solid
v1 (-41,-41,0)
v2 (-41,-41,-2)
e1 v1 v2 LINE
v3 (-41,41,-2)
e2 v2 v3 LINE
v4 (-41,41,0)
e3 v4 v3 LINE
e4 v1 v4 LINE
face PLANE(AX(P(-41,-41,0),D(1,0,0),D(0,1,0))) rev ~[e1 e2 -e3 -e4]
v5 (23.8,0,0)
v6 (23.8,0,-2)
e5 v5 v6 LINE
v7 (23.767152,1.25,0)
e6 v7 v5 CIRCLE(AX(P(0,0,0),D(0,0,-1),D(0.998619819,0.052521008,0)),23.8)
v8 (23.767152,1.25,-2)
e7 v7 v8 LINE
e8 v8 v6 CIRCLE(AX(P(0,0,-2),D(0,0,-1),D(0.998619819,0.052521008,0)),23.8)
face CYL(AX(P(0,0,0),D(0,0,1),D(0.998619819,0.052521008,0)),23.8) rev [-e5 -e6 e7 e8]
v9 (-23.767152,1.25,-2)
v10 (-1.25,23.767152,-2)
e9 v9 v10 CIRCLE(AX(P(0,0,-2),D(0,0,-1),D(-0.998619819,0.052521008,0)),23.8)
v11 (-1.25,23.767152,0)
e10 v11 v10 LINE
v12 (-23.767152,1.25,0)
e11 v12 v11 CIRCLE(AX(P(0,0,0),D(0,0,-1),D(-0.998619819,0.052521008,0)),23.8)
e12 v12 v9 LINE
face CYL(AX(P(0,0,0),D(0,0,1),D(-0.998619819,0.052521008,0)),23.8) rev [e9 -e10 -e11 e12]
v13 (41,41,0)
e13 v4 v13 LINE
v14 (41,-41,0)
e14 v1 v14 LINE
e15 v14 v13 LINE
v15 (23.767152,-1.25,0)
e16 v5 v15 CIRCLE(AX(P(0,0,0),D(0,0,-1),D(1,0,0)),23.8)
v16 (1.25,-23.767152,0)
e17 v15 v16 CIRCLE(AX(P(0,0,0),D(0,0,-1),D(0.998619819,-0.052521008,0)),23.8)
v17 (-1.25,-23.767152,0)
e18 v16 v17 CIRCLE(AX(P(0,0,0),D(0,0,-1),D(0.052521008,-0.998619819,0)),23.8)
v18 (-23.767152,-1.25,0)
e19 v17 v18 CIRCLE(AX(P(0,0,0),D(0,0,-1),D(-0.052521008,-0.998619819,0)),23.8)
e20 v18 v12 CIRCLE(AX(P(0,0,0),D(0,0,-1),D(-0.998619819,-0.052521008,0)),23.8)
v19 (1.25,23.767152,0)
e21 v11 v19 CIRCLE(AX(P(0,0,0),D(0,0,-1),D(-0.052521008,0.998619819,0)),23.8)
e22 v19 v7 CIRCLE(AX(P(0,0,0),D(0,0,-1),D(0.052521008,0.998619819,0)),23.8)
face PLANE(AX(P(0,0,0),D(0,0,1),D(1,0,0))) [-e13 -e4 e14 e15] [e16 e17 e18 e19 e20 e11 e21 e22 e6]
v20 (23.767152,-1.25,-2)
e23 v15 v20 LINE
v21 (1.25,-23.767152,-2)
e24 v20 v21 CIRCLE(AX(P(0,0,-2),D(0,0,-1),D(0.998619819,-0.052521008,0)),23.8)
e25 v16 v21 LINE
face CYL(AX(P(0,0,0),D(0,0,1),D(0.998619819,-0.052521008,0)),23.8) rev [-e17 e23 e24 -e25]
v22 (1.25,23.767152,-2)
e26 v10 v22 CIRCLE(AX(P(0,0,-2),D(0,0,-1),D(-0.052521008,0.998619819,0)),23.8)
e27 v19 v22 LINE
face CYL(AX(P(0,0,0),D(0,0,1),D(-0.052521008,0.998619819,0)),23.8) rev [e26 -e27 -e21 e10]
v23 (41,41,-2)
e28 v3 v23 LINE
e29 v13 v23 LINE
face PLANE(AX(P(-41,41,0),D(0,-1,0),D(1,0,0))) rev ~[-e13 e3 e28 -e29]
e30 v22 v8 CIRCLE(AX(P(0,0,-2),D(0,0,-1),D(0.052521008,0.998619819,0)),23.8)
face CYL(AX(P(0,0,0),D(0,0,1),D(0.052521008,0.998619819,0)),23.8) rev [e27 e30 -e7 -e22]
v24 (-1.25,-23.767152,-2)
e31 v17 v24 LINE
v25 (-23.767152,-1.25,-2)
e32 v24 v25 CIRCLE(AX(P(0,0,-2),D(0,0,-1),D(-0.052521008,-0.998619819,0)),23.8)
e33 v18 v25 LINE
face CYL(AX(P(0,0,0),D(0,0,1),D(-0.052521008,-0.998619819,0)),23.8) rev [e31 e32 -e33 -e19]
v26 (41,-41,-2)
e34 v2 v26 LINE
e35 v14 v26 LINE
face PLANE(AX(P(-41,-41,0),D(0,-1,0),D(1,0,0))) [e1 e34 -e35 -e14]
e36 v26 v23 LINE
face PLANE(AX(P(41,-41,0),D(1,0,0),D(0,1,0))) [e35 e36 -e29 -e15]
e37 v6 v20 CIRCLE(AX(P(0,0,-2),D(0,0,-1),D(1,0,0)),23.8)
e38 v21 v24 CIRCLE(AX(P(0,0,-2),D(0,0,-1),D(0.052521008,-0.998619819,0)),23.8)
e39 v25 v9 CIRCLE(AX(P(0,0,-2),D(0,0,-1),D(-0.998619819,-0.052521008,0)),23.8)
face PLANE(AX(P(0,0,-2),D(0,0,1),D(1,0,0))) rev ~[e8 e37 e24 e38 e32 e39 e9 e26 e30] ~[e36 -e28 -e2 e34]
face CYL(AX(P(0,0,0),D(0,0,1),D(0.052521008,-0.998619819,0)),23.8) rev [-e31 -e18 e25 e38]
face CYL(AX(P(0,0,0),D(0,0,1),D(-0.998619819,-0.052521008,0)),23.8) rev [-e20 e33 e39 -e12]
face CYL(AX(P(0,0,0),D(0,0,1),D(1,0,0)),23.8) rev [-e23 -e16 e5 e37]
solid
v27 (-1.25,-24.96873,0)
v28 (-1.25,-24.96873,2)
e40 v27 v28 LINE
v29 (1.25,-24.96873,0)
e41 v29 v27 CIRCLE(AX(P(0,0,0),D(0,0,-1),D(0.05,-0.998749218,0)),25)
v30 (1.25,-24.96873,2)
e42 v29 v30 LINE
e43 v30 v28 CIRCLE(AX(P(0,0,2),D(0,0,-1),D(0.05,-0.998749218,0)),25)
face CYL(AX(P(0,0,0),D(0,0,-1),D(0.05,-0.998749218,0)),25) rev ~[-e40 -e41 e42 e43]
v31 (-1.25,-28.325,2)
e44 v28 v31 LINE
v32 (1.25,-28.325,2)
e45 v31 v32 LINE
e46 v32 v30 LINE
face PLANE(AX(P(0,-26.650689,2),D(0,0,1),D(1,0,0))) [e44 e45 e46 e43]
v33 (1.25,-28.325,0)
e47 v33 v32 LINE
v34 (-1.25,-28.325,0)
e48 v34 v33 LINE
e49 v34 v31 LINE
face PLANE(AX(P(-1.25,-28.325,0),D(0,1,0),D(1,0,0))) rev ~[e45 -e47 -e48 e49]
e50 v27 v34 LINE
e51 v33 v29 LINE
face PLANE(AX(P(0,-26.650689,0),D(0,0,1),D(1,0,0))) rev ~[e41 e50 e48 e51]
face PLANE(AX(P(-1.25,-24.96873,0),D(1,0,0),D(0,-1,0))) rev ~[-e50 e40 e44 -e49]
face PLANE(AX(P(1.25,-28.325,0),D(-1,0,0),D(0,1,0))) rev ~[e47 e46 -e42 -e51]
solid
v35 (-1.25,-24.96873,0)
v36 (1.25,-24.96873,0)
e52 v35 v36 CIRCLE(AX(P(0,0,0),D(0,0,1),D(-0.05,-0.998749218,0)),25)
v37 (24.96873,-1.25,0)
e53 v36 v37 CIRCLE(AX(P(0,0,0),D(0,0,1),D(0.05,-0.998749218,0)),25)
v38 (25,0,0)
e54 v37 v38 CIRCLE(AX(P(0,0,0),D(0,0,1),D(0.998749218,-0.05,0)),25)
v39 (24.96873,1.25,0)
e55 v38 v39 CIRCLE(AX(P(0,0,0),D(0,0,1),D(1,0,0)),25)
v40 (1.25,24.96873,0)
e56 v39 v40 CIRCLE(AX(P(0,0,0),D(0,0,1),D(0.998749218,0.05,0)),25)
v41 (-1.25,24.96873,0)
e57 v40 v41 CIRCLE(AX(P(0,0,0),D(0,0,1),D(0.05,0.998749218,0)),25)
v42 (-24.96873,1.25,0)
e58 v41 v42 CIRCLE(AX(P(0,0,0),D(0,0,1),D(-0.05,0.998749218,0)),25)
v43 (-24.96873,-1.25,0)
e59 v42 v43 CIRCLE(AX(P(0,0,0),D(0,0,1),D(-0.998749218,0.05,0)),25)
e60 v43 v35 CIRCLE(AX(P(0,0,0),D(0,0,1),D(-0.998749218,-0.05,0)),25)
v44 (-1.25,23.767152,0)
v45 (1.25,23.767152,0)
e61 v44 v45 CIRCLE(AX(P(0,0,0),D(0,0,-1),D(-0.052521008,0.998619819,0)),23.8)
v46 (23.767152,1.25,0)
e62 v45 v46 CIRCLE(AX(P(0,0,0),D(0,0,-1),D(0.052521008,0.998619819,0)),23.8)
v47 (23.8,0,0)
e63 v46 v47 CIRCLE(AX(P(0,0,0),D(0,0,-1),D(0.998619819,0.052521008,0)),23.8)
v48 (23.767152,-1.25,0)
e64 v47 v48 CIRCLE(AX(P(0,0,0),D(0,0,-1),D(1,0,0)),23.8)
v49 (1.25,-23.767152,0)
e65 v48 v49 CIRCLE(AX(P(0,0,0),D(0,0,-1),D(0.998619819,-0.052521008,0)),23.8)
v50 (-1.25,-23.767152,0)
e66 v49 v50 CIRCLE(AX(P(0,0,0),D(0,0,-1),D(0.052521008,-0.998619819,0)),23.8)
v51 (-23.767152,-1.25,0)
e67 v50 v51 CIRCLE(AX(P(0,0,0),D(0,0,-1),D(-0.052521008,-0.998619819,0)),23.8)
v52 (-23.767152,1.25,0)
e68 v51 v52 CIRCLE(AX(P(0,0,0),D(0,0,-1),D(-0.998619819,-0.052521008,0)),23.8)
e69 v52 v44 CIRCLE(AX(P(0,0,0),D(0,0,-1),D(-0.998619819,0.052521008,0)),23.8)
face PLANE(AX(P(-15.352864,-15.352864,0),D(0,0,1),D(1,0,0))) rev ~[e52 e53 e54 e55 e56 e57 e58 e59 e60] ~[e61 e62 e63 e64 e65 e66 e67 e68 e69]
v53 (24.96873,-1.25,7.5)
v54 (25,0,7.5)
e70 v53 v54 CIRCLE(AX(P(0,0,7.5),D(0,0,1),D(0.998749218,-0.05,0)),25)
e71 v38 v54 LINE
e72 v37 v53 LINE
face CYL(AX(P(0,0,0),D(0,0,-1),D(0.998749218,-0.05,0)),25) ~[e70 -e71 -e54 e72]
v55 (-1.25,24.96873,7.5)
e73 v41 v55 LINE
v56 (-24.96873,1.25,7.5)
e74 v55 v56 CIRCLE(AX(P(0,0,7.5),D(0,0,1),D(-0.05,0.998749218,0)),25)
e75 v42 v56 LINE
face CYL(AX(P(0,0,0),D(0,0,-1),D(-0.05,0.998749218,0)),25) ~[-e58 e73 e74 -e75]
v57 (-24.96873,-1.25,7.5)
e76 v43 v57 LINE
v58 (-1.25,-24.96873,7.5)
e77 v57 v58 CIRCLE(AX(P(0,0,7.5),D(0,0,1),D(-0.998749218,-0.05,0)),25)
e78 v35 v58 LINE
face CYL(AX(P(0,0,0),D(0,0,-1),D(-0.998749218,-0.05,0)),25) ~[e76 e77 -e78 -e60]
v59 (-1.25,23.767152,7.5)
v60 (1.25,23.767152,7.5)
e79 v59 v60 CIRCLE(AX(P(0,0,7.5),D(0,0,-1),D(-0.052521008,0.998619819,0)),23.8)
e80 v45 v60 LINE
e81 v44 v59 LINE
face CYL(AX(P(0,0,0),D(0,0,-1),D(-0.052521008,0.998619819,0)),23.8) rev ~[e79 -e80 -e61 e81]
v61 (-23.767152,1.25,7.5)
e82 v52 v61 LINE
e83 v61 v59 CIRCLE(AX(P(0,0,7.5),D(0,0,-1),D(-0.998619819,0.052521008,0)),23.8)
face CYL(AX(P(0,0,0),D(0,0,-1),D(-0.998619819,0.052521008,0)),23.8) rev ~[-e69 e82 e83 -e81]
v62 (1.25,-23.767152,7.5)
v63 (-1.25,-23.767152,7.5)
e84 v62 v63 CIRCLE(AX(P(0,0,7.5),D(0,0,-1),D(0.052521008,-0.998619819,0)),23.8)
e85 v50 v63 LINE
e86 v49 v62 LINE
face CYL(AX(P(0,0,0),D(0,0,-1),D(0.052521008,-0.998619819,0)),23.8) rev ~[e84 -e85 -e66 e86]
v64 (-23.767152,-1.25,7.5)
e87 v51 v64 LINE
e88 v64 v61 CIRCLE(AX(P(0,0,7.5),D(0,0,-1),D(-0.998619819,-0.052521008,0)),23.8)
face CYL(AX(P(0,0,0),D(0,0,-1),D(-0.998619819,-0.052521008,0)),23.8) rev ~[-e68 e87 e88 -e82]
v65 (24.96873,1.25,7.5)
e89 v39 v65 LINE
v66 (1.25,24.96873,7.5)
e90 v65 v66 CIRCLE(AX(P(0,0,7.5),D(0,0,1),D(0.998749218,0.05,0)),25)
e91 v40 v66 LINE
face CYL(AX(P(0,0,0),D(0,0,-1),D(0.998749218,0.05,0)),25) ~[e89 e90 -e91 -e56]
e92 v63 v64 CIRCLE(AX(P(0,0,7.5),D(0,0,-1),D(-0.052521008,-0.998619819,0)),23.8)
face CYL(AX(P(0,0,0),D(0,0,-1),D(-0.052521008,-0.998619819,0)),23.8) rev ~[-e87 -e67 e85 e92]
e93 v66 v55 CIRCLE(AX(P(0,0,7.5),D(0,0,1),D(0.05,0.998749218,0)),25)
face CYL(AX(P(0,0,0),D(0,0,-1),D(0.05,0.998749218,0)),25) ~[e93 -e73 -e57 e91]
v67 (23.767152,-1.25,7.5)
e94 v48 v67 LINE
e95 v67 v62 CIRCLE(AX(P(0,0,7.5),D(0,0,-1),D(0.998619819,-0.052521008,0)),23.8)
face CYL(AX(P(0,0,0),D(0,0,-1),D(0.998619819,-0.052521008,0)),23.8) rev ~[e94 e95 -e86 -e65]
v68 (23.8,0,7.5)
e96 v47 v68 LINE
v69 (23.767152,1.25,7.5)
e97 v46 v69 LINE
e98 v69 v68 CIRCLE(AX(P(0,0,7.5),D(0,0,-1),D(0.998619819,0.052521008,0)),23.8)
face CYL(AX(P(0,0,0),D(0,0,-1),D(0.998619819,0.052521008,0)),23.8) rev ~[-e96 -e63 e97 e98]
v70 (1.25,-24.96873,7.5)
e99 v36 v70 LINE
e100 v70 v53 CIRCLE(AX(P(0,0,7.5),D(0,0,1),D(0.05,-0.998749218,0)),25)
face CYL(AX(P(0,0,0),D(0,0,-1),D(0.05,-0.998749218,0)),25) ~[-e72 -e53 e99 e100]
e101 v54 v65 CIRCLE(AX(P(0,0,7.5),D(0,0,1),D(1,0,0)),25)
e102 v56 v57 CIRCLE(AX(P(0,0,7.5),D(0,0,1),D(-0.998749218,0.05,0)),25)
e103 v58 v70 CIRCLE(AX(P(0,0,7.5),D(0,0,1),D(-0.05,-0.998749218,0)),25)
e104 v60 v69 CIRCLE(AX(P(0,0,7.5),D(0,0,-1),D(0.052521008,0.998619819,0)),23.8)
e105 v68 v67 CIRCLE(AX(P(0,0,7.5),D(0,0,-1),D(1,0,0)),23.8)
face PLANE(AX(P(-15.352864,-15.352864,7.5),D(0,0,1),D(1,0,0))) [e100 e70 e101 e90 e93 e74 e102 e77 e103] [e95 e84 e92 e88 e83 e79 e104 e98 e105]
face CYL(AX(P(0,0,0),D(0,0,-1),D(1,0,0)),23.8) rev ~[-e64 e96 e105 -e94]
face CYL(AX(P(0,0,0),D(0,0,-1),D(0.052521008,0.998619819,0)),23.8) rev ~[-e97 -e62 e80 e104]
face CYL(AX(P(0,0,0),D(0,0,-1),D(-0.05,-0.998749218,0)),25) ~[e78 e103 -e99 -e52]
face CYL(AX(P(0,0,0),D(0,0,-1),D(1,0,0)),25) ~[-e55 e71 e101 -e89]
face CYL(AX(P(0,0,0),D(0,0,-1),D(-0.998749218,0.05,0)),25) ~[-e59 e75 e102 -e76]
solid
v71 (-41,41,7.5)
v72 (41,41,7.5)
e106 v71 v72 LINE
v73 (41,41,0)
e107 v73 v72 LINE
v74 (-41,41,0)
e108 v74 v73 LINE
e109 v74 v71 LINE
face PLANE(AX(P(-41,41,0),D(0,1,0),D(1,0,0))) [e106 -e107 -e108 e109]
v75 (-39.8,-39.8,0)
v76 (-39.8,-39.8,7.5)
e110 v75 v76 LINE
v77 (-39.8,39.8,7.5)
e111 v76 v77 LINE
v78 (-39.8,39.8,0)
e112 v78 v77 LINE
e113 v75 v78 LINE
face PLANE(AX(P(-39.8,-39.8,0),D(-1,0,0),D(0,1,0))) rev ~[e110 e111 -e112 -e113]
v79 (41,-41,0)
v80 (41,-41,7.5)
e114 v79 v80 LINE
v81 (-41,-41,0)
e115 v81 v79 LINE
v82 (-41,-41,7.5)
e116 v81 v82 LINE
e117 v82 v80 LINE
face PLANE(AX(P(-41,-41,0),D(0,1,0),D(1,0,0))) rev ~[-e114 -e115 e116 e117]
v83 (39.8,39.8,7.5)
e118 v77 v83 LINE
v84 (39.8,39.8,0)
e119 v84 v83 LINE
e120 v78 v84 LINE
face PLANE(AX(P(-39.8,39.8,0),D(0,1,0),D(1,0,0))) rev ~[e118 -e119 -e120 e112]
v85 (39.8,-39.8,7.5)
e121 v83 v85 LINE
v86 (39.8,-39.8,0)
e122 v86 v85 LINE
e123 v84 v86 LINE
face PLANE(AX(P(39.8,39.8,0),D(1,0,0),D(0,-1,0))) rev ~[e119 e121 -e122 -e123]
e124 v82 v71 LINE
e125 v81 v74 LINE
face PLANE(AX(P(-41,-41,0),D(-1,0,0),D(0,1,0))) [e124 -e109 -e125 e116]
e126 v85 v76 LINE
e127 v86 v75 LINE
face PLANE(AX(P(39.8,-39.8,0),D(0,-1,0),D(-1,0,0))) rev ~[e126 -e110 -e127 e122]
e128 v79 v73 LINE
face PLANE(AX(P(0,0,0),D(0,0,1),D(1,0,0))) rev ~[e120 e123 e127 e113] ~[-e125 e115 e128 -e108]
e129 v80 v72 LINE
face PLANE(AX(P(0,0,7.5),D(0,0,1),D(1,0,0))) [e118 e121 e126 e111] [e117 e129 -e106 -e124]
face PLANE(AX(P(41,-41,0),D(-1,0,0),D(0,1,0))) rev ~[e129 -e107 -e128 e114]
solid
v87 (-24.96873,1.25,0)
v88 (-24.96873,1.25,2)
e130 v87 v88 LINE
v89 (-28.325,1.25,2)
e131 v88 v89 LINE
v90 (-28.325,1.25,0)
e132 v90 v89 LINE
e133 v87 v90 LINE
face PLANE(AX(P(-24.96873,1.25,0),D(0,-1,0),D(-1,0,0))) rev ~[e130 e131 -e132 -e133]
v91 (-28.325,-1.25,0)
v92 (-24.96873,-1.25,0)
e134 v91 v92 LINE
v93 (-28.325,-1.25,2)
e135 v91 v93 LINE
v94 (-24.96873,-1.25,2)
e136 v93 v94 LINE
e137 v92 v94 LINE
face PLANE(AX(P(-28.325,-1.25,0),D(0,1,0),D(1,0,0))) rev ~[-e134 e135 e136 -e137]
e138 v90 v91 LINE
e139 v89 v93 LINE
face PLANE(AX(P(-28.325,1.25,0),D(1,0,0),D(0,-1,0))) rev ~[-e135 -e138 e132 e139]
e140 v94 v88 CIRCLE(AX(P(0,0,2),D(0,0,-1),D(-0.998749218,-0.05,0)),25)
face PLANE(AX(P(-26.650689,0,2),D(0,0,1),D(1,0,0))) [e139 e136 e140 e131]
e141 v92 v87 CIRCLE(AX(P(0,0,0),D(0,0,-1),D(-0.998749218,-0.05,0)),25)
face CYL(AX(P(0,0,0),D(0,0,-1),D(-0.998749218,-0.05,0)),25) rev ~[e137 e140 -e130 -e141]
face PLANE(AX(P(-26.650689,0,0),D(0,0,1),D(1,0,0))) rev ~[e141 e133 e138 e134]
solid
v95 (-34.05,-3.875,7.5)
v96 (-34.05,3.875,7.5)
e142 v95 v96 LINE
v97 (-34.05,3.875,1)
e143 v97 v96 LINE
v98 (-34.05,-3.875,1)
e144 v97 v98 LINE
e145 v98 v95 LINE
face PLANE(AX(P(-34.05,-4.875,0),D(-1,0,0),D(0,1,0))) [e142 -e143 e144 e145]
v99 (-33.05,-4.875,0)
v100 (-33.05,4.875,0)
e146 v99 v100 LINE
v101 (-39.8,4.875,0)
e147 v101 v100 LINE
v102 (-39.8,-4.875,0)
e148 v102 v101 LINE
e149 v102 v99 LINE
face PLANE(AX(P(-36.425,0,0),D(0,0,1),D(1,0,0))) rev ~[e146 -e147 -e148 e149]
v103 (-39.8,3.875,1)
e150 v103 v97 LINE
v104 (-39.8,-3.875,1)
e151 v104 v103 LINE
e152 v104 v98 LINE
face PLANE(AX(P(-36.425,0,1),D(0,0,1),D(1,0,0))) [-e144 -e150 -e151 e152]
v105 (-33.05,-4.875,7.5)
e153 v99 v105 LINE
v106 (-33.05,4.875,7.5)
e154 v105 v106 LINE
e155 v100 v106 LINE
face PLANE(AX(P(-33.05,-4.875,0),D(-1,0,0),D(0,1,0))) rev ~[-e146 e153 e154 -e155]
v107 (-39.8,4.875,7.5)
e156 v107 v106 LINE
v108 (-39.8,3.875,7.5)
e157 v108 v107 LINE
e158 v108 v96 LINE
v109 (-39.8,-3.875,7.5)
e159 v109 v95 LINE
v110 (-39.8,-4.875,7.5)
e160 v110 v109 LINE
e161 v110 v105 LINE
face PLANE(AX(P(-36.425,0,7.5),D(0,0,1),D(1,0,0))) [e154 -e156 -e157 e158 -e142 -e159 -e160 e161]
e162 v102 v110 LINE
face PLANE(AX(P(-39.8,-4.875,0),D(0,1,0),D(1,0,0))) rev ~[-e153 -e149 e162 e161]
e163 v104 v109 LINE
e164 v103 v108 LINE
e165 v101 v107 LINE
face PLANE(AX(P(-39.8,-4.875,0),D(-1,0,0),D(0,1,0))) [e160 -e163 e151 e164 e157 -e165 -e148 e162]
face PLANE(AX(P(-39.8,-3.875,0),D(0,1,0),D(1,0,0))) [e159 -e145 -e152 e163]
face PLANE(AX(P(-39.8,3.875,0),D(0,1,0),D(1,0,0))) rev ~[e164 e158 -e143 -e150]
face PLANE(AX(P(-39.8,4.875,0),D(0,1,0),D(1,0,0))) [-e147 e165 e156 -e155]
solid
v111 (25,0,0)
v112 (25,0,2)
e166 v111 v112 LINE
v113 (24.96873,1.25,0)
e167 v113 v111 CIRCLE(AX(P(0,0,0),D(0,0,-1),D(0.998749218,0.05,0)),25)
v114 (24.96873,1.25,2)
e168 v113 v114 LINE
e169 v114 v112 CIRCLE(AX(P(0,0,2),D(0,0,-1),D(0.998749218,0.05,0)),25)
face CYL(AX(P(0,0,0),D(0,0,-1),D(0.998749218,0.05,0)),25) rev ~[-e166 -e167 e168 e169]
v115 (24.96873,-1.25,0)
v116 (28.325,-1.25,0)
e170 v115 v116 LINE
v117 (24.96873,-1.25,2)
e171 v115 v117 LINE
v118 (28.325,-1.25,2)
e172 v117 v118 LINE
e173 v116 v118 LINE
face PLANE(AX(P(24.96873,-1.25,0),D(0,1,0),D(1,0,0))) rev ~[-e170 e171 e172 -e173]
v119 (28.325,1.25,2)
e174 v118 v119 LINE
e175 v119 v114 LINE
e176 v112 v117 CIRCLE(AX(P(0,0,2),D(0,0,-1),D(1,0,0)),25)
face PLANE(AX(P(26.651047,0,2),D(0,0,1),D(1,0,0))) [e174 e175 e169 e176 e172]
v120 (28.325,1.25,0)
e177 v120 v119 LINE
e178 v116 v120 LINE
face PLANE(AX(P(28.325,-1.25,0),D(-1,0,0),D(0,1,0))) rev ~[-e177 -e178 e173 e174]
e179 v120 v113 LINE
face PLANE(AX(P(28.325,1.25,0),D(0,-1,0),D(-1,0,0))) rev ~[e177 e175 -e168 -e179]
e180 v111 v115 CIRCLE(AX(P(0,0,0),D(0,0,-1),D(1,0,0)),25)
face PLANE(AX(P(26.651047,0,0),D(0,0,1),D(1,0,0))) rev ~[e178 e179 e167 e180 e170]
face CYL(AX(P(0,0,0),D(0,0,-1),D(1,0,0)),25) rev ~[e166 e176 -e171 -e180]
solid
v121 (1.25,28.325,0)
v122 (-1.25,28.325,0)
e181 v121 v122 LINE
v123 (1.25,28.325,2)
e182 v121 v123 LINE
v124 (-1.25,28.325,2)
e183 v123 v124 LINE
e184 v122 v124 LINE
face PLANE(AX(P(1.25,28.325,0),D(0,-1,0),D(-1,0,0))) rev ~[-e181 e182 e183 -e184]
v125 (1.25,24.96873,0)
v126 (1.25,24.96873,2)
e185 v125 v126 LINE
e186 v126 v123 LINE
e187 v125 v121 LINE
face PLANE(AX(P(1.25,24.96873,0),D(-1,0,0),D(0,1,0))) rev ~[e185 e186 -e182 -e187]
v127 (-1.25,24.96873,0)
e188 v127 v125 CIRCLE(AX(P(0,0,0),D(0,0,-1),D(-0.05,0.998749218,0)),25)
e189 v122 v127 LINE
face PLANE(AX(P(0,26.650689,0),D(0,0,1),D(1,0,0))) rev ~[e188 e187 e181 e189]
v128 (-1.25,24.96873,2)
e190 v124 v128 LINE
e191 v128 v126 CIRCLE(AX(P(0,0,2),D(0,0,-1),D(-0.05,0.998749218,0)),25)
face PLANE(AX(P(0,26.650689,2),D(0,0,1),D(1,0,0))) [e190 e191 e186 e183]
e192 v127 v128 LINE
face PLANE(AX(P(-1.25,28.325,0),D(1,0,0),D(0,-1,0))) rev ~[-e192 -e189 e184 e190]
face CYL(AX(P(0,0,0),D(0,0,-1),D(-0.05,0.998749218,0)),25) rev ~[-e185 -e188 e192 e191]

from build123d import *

# Parameters (mm, degrees)
F1_DEPTH = 7.5
F0_W     = 82
F0_H     = 82
F0_R     = 32.8
F0_W_2   = 6.75
F0_H_2   = 9.75
F2_DEPTH = 2
F3_DEPTH = 2
F4_DEPTH = 7.5
F5_T     = -1


# Not quite as in the source:
# - a feature names something its author has since deleted; it is built from what else it names


with BuildPart() as f1:
    # F0 (on Top) → F1 (new body)
    with BuildSketch(Plane.XY):
        with BuildLine():
            ThreePointArc((-24.9687304443, -1.25), (-17.6776695297, -17.6776695297), (-1.25, -24.9687304443))
            Line((-1.25, -24.9687304443), (-1.25, -23.7671517015))
            ThreePointArc((-1.25, -23.7671517015), (-16.8291413922, -16.8291413922), (-23.7671517015, -1.25))
            Line((-23.7671517015, -1.25), (-24.9687304443, -1.25))
        make_face()
        with BuildLine():
            Line((-1.25, 23.7671517015), (-1.25, 24.9687304443))
            ThreePointArc((-1.25, 24.9687304443), (-17.6776695297, 17.6776695297), (-24.9687304443, 1.25))
            Line((-24.9687304443, 1.25), (-23.7671517015, 1.25))
            ThreePointArc((-23.7671517015, 1.25), (-16.8291413922, 16.8291413922), (-1.25, 23.7671517015))
        make_face()
        with BuildLine():
            Line((23.7671517015, 1.25), (24.9687304443, 1.25))
            ThreePointArc((24.9687304443, 1.25), (17.6776695297, 17.6776695297), (1.25, 24.9687304443))
            Line((1.25, 24.9687304443), (1.25, 23.7671517015))
            ThreePointArc((1.25, 23.7671517015), (16.8291413922, 16.8291413922), (23.7671517015, 1.25))
        make_face()
        with BuildLine():
            ThreePointArc((1.25, -24.9687304443), (17.6776695297, -17.6776695297), (24.9687304443, -1.25))
            Line((24.9687304443, -1.25), (23.7671517015, -1.25))
            ThreePointArc((23.7671517015, -1.25), (16.8291413922, -16.8291413922), (1.25, -23.7671517015))
            Line((1.25, -23.7671517015), (1.25, -24.9687304443))
        make_face()
        with BuildLine():
            Line((1.25, 23.7671517015), (1.25, 24.9687304443))
            ThreePointArc((1.25, 24.9687304443), (0, 25), (-1.25, 24.9687304443))
            Line((-1.25, 24.9687304443), (-1.25, 23.7671517015))
            ThreePointArc((-1.25, 23.7671517015), (0, 23.8), (1.25, 23.7671517015))
        make_face()
        with BuildLine():
            ThreePointArc((-1.25, -24.9687304443), (0, -25), (1.25, -24.9687304443))
            Line((1.25, -24.9687304443), (1.25, -23.7671517015))
            ThreePointArc((1.25, -23.7671517015), (0, -23.8), (-1.25, -23.7671517015))
            Line((-1.25, -23.7671517015), (-1.25, -24.9687304443))
        make_face()
        with BuildLine():
            ThreePointArc((24.9687304443, -1.25), (24.9921813885, -0.6251955264), (25, 0))
            ThreePointArc((25, 0), (24.9921813885, 0.6251955264), (24.9687304443, 1.25))
            Line((24.9687304443, 1.25), (23.7671517015, 1.25))
            ThreePointArc((23.7671517015, 1.25), (23.7917865081, 0.6252157649), (23.8, 0))
            ThreePointArc((23.8, 0), (23.7917865081, -0.6252157649), (23.7671517015, -1.25))
            Line((23.7671517015, -1.25), (24.9687304443, -1.25))
        make_face()
        with BuildLine():
            Line((-23.7671517015, 1.25), (-24.9687304443, 1.25))
            ThreePointArc((-24.9687304443, 1.25), (-25, 0), (-24.9687304443, -1.25))
            Line((-24.9687304443, -1.25), (-23.7671517015, -1.25))
            ThreePointArc((-23.7671517015, -1.25), (-23.8, 0), (-23.7671517015, 1.25))
        make_face()
    extrude(amount=F1_DEPTH)


with BuildPart() as f1b:
    # F0 (on Top) → F1, piece 2 (new body)
    with BuildSketch(Plane.XY):
        Rectangle(F0_W, F0_H)
        Polygon((-39.8, 4.875), (-39.8, 39.8), (39.8, 39.8), (39.8, -39.8), (-39.8, -39.8), (-39.8, -4.875), align=None, mode=Mode.SUBTRACT)
    extrude(amount=F1_DEPTH)


with BuildPart() as f2:
    # F0 (on Top) → F2 (new body)
    with BuildSketch(Plane.XY):
        Rectangle(F0_W, F0_H)
        Polygon((-39.8, 4.875), (-39.8, 39.8), (39.8, 39.8), (39.8, -39.8), (-39.8, -39.8), (-39.8, -4.875), align=None, mode=Mode.SUBTRACT)
        Polygon((39.8, 39.8), (-39.8, 39.8), (-39.8, 4.875), (-33.05, 4.875), (-33.05, -4.875), (-39.8, -4.875), (-39.8, -39.8), (39.8, -39.8), align=None)
        Circle(F0_R, mode=Mode.SUBTRACT)
        Circle(F0_R)
        with BuildLine():
            ThreePointArc((1.25, 24.9687304443), (17.6776695297, 17.6776695297), (24.9687304443, 1.25))
            Line((24.9687304443, 1.25), (28.325, 1.25))
            Line((28.325, 1.25), (28.325, -1.25))
            Line((28.325, -1.25), (24.9687304443, -1.25))
            ThreePointArc((24.9687304443, -1.25), (17.6776695297, -17.6776695297), (1.25, -24.9687304443))
            Line((1.25, -24.9687304443), (1.25, -28.325))
            Line((1.25, -28.325), (-1.25, -28.325))
            Line((-1.25, -28.325), (-1.25, -24.9687304443))
            ThreePointArc((-1.25, -24.9687304443), (-17.6776695297, -17.6776695297), (-24.9687304443, -1.25))
            Line((-24.9687304443, -1.25), (-28.325, -1.25))
            Line((-28.325, -1.25), (-28.325, 1.25))
            Line((-28.325, 1.25), (-24.9687304443, 1.25))
            ThreePointArc((-24.9687304443, 1.25), (-17.6776695297, 17.6776695297), (-1.25, 24.9687304443))
            Line((-1.25, 24.9687304443), (-1.25, 28.325))
            Line((-1.25, 28.325), (1.25, 28.325))
            Line((1.25, 28.325), (1.25, 24.9687304443))
        make_face(mode=Mode.SUBTRACT)
        with Locations((-36.425, 0)):
            Rectangle(F0_W_2, F0_H_2)
        with BuildLine():
            Line((23.7671517015, 1.25), (24.9687304443, 1.25))
            ThreePointArc((24.9687304443, 1.25), (17.6776695297, 17.6776695297), (1.25, 24.9687304443))
            Line((1.25, 24.9687304443), (1.25, 23.7671517015))
            ThreePointArc((1.25, 23.7671517015), (16.8291413922, 16.8291413922), (23.7671517015, 1.25))
        make_face()
        with BuildLine():
            Line((-1.25, 23.7671517015), (-1.25, 24.9687304443))
            ThreePointArc((-1.25, 24.9687304443), (-17.6776695297, 17.6776695297), (-24.9687304443, 1.25))
            Line((-24.9687304443, 1.25), (-23.7671517015, 1.25))
            ThreePointArc((-23.7671517015, 1.25), (-16.8291413922, 16.8291413922), (-1.25, 23.7671517015))
        make_face()
        with BuildLine():
            ThreePointArc((-24.9687304443, -1.25), (-17.6776695297, -17.6776695297), (-1.25, -24.9687304443))
            Line((-1.25, -24.9687304443), (-1.25, -23.7671517015))
            ThreePointArc((-1.25, -23.7671517015), (-16.8291413922, -16.8291413922), (-23.7671517015, -1.25))
            Line((-23.7671517015, -1.25), (-24.9687304443, -1.25))
        make_face()
        with BuildLine():
            ThreePointArc((1.25, -24.9687304443), (17.6776695297, -17.6776695297), (24.9687304443, -1.25))
            Line((24.9687304443, -1.25), (23.7671517015, -1.25))
            ThreePointArc((23.7671517015, -1.25), (16.8291413922, -16.8291413922), (1.25, -23.7671517015))
            Line((1.25, -23.7671517015), (1.25, -24.9687304443))
        make_face()
        with BuildLine():
            ThreePointArc((-24.9687304443, -1.25), (-25, 0), (-24.9687304443, 1.25))
            Line((-24.9687304443, 1.25), (-28.325, 1.25))
            Line((-28.325, 1.25), (-28.325, -1.25))
            Line((-28.325, -1.25), (-24.9687304443, -1.25))
        make_face()
        with BuildLine():
            Line((1.25, -28.325), (1.25, -24.9687304443))
            ThreePointArc((1.25, -24.9687304443), (0, -25), (-1.25, -24.9687304443))
            Line((-1.25, -24.9687304443), (-1.25, -28.325))
            Line((-1.25, -28.325), (1.25, -28.325))
        make_face()
        with BuildLine():
            ThreePointArc((-1.25, 24.9687304443), (0, 25), (1.25, 24.9687304443))
            Line((1.25, 24.9687304443), (1.25, 28.325))
            Line((1.25, 28.325), (-1.25, 28.325))
            Line((-1.25, 28.325), (-1.25, 24.9687304443))
        make_face()
        with BuildLine():
            ThreePointArc((24.9687304443, 1.25), (24.9921813885, 0.6251955264), (25, 0))
            ThreePointArc((25, 0), (24.9921813885, -0.6251955264), (24.9687304443, -1.25))
            Line((24.9687304443, -1.25), (28.325, -1.25))
            Line((28.325, -1.25), (28.325, 1.25))
            Line((28.325, 1.25), (24.9687304443, 1.25))
        make_face()
        with BuildLine():
            Line((1.25, 23.7671517015), (1.25, 24.9687304443))
            ThreePointArc((1.25, 24.9687304443), (0, 25), (-1.25, 24.9687304443))
            Line((-1.25, 24.9687304443), (-1.25, 23.7671517015))
            ThreePointArc((-1.25, 23.7671517015), (0, 23.8), (1.25, 23.7671517015))
        make_face()
        with BuildLine():
            Line((-23.7671517015, 1.25), (-24.9687304443, 1.25))
            ThreePointArc((-24.9687304443, 1.25), (-25, 0), (-24.9687304443, -1.25))
            Line((-24.9687304443, -1.25), (-23.7671517015, -1.25))
            ThreePointArc((-23.7671517015, -1.25), (-23.8, 0), (-23.7671517015, 1.25))
        make_face()
        with BuildLine():
            ThreePointArc((-1.25, -24.9687304443), (0, -25), (1.25, -24.9687304443))
            Line((1.25, -24.9687304443), (1.25, -23.7671517015))
            ThreePointArc((1.25, -23.7671517015), (0, -23.8), (-1.25, -23.7671517015))
            Line((-1.25, -23.7671517015), (-1.25, -24.9687304443))
        make_face()
        with BuildLine():
            ThreePointArc((24.9687304443, -1.25), (24.9921813885, -0.6251955264), (25, 0))
            ThreePointArc((25, 0), (24.9921813885, 0.6251955264), (24.9687304443, 1.25))
            Line((24.9687304443, 1.25), (23.7671517015, 1.25))
            ThreePointArc((23.7671517015, 1.25), (23.7917865081, 0.6252157649), (23.8, 0))
            ThreePointArc((23.8, 0), (23.7917865081, -0.6252157649), (23.7671517015, -1.25))
            Line((23.7671517015, -1.25), (24.9687304443, -1.25))
        make_face()
    extrude(amount=-F2_DEPTH)


with BuildPart() as f3:
    # F0 (on Top) → F3 (new body)
    with BuildSketch(Plane.XY):
        with BuildLine():
            ThreePointArc((-24.9687304443, -1.25), (-25, 0), (-24.9687304443, 1.25))
            Line((-24.9687304443, 1.25), (-28.325, 1.25))
            Line((-28.325, 1.25), (-28.325, -1.25))
            Line((-28.325, -1.25), (-24.9687304443, -1.25))
        make_face()
    extrude(amount=F3_DEPTH)


with BuildPart() as f3b:
    # F0 (on Top) → F3, piece 2 (new body)
    with BuildSketch(Plane.XY):
        with BuildLine():
            ThreePointArc((-1.25, 24.9687304443), (0, 25), (1.25, 24.9687304443))
            Line((1.25, 24.9687304443), (1.25, 28.325))
            Line((1.25, 28.325), (-1.25, 28.325))
            Line((-1.25, 28.325), (-1.25, 24.9687304443))
        make_face()
    extrude(amount=F3_DEPTH)


with BuildPart() as f3c:
    # F0 (on Top) → F3, piece 3 (new body)
    with BuildSketch(Plane.XY):
        with BuildLine():
            ThreePointArc((24.9687304443, 1.25), (24.9921813885, 0.6251955264), (25, 0))
            ThreePointArc((25, 0), (24.9921813885, -0.6251955264), (24.9687304443, -1.25))
            Line((24.9687304443, -1.25), (28.325, -1.25))
            Line((28.325, -1.25), (28.325, 1.25))
            Line((28.325, 1.25), (24.9687304443, 1.25))
        make_face()
    extrude(amount=F3_DEPTH)


with BuildPart() as f3d:
    # F0 (on Top) → F3, piece 4 (new body)
    with BuildSketch(Plane.XY):
        with BuildLine():
            Line((1.25, -28.325), (1.25, -24.9687304443))
            ThreePointArc((1.25, -24.9687304443), (0, -25), (-1.25, -24.9687304443))
            Line((-1.25, -24.9687304443), (-1.25, -28.325))
            Line((-1.25, -28.325), (1.25, -28.325))
        make_face()
    extrude(amount=F3_DEPTH)


with BuildPart() as f4:
    # F0 (on Top) → F4 (new body)
    with BuildSketch(Plane.XY):
        with Locations((-36.425, 0)):
            Rectangle(F0_W_2, F0_H_2)
    extrude(amount=F4_DEPTH)

    # F5
    f5_openings = [f4.faces().sort_by_distance(p)[0] for p in [
        (-39.8, 0, 3.75),
        (-36.425, 0, 7.5),
    ]]
    offset(amount=F5_T, openings=f5_openings)


solid = Compound([f1.part, f1b.part, f2.part, f3.part, f3b.part, f3c.part, f3d.part, f4.part])
